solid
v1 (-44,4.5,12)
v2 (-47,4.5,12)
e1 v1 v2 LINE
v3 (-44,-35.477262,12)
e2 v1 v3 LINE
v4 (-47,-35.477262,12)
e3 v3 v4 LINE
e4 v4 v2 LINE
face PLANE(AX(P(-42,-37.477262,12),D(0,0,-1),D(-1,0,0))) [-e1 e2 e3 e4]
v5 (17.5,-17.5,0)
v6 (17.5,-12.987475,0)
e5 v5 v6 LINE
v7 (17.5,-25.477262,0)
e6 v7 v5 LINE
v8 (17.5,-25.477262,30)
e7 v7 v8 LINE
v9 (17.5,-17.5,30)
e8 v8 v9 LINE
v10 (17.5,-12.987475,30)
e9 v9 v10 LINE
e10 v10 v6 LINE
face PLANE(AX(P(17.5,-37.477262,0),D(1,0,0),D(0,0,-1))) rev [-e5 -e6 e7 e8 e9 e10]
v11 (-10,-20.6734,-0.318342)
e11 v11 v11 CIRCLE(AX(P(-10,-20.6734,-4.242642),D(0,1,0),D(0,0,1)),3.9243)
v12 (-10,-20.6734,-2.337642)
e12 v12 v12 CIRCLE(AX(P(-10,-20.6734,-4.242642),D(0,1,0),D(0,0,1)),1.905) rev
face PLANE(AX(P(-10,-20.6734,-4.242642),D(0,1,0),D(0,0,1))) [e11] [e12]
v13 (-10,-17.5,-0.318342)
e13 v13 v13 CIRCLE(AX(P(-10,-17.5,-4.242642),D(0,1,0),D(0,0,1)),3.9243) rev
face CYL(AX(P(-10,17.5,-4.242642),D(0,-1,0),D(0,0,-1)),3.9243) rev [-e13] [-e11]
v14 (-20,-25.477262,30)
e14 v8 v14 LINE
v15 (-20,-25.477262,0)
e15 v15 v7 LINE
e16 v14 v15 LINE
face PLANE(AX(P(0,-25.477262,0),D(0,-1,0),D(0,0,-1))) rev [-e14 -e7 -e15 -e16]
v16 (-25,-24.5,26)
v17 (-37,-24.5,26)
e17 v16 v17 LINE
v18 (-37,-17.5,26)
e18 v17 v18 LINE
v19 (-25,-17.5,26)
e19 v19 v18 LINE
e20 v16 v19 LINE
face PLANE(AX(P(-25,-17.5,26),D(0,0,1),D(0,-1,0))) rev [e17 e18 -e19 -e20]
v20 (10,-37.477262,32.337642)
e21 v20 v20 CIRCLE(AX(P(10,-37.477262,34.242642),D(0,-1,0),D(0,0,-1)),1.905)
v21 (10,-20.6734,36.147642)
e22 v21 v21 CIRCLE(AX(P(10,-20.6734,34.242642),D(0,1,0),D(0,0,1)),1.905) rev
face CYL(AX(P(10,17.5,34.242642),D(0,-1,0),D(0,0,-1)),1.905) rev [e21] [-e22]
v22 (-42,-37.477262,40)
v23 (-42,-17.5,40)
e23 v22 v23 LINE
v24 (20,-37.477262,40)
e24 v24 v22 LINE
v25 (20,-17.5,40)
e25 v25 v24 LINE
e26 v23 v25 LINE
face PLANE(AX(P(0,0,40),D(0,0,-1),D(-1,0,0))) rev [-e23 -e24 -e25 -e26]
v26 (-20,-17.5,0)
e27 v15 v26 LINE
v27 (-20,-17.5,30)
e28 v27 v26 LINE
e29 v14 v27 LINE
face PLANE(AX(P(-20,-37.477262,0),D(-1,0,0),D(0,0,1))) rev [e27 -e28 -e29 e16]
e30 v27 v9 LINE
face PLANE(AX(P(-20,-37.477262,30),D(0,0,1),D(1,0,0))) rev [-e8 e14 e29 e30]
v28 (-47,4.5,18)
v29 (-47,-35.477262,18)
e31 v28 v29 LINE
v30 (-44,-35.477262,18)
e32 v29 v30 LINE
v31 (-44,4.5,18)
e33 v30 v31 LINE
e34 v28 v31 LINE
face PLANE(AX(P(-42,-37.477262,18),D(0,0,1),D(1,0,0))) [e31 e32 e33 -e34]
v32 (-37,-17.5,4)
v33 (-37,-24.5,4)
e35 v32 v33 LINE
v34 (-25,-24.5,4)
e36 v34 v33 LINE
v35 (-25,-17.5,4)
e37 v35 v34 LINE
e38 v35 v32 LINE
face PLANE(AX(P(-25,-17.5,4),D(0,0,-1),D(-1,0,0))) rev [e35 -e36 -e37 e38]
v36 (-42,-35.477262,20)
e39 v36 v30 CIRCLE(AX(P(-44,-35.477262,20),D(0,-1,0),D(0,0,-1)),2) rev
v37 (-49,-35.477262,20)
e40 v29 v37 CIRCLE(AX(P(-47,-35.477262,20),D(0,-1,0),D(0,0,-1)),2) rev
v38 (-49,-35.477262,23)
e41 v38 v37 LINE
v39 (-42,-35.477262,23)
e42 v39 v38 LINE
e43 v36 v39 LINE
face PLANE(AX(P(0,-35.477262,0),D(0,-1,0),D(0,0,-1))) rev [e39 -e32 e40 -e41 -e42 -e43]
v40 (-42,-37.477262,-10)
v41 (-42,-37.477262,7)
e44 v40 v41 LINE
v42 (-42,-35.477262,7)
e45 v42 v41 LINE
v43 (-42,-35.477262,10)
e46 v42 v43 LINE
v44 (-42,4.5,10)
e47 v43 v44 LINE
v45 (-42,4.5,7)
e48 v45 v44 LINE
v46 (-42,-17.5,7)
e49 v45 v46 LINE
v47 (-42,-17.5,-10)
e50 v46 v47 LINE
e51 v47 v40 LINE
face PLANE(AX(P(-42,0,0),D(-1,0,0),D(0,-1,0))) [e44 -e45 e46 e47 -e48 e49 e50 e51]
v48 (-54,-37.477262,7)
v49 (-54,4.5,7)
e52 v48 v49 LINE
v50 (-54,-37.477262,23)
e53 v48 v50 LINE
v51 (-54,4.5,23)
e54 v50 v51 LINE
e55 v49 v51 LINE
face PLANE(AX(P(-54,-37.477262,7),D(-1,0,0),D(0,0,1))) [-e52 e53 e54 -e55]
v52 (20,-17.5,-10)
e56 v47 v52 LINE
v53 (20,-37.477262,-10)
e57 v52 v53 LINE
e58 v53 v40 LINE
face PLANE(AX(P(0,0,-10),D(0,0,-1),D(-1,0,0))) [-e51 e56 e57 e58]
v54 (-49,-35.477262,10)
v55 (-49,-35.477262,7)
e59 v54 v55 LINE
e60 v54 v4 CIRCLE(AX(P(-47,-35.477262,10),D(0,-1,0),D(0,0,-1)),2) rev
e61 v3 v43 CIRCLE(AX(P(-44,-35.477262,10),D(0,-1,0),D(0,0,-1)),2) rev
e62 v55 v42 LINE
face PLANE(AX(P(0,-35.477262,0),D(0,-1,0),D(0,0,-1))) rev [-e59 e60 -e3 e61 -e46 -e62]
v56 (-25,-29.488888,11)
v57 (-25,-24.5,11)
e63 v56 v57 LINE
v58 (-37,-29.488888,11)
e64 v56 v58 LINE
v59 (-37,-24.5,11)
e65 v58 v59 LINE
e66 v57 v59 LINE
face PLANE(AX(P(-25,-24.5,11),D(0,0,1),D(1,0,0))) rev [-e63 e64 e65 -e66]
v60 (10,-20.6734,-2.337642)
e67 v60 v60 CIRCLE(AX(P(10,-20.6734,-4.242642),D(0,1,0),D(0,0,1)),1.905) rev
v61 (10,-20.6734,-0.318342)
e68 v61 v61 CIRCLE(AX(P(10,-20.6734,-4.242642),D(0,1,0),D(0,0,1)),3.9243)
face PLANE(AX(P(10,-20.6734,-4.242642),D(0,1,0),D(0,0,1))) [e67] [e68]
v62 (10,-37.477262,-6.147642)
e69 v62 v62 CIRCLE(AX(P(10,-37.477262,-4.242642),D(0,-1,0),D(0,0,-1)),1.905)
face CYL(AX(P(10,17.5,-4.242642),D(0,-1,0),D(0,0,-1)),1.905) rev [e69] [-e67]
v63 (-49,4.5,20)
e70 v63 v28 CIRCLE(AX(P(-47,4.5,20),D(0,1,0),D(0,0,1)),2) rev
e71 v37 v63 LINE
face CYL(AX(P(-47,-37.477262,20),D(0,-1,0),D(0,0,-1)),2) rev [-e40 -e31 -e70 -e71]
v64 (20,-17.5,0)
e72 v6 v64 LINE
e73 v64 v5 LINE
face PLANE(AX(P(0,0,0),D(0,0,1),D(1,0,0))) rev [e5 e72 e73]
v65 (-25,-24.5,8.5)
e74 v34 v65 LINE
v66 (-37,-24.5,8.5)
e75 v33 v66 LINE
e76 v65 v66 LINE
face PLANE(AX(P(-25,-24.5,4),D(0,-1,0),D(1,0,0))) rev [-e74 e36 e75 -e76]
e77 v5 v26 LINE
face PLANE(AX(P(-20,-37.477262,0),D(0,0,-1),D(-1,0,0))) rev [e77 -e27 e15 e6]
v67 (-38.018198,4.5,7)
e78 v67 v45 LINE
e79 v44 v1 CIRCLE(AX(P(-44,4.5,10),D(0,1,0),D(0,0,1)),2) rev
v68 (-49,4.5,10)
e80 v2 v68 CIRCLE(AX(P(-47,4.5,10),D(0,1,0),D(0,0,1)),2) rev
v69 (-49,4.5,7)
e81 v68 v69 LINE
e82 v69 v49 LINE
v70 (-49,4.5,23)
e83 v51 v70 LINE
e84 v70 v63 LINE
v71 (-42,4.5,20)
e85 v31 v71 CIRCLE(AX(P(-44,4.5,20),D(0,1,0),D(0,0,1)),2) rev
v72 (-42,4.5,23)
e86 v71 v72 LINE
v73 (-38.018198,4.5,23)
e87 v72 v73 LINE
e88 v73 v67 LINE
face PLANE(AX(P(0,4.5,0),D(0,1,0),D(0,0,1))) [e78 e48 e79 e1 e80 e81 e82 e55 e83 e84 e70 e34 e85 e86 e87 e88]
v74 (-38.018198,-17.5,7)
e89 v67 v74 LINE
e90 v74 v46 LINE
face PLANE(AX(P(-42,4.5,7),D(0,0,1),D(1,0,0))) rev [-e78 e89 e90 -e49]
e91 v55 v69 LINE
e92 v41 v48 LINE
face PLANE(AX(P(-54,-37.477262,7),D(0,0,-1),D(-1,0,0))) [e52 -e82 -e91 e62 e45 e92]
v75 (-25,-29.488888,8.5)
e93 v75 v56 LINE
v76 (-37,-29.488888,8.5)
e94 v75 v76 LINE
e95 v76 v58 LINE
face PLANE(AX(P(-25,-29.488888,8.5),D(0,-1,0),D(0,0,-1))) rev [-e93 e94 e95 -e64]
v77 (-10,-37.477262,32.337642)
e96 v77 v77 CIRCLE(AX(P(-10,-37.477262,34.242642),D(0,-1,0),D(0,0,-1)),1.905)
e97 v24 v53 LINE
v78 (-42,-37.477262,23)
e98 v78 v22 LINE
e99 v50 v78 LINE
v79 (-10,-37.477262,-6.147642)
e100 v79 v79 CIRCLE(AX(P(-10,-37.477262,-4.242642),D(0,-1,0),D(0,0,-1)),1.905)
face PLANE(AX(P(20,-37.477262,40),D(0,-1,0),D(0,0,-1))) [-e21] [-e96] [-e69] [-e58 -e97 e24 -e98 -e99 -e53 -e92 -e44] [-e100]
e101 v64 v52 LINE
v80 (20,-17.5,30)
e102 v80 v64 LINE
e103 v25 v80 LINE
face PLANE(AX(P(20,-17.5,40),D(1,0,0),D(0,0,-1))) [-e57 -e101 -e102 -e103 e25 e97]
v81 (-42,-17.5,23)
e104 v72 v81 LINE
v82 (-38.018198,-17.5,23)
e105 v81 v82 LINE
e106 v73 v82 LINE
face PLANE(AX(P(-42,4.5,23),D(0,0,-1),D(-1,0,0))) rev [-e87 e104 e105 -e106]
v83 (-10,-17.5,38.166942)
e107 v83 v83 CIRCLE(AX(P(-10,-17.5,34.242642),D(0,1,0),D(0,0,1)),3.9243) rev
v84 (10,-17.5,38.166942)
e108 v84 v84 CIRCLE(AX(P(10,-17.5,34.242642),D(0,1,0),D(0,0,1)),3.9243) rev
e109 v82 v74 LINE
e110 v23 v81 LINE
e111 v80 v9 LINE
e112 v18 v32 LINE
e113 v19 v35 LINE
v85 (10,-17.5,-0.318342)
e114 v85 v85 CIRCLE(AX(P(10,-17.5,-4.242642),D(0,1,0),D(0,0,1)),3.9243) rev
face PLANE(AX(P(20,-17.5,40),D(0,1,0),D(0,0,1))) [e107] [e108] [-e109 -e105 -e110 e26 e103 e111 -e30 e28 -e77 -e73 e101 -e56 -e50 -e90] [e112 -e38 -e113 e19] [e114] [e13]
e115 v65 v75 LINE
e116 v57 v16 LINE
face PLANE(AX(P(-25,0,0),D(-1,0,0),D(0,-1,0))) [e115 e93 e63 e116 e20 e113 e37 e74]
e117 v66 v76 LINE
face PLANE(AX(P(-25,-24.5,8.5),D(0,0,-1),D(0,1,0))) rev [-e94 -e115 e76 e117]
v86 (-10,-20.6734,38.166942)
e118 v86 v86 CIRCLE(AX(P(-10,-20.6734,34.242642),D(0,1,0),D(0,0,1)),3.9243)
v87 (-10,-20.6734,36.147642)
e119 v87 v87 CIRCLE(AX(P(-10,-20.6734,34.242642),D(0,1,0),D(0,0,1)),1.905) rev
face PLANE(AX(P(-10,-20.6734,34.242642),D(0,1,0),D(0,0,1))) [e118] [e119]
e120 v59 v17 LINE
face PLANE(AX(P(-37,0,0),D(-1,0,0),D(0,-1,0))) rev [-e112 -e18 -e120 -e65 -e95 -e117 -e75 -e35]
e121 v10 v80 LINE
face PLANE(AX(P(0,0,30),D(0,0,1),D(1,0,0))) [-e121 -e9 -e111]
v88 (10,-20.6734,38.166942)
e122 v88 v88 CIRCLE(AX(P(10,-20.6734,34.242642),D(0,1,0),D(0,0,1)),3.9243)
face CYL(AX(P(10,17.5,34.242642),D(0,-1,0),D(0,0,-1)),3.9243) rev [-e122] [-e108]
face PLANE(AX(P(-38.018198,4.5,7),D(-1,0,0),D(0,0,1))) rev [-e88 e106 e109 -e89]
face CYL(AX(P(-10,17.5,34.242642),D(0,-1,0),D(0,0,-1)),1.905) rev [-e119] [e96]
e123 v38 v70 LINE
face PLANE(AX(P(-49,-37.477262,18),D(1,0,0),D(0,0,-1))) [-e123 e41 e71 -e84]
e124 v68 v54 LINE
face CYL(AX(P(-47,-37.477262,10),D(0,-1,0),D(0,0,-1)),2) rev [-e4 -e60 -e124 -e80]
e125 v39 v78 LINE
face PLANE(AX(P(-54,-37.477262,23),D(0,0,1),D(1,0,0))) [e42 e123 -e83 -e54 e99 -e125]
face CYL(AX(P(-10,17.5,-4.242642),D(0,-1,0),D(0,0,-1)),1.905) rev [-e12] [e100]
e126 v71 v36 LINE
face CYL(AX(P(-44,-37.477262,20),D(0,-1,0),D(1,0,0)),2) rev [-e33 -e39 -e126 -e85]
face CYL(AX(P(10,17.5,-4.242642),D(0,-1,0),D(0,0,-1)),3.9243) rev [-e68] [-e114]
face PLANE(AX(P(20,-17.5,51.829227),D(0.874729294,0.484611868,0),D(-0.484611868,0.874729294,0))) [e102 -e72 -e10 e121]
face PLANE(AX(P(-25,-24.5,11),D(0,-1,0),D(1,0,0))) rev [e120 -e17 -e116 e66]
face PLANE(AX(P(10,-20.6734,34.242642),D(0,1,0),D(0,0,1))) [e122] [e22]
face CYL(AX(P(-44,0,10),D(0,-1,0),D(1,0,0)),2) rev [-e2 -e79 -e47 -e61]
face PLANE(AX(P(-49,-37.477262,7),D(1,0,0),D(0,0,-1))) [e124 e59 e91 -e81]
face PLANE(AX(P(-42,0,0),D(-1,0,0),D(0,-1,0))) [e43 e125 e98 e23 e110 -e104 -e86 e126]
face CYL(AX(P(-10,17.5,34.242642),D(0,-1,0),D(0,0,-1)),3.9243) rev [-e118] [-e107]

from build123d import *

# Parameters (mm, degrees)
SKETCH1_R               = 17.5
BOSS_EXTRUDE1_DEPTH     = 30
SKETCH5_R               = 10.95
CUT_EXTRUDE2_DEPTH      = 39.890873
SWEEP2_PITCH            = 10
SKETCH8_R               = 17.5
CUT_EXTRUDE3_DEPTH      = 41.699
SKETCH9_R               = 17.5
CUT_EXTRUDE4_DEPTH      = 39.890874
SKETCH10_W              = 40
SKETCH10_H              = 19.977262
BOSS_EXTRUDE2_DEPTH     = 40
SKETCH11_W              = 40
SKETCH11_H              = 19.977262
BOSS_EXTRUDE3_DEPTH     = 10
BOSS_EXTRUDE4_DEPTH     = 30
SKETCH14_R              = 1.905
CUT_EXTRUDE5_DEPTH      = 71.869594
SKETCH15_R              = 3.9243
CUT_EXTRUDE7_DEPTH      = 59.798031
SKETCH16_W              = 50
SKETCH16_H              = 19.977262
BOSS_EXTRUDE5_DEPTH     = 22
CUT_EXTRUDE8_DEPTH      = 12
BOSS_EXTRUDE6_DEPTH     = 19.977262
BOSS_EXTRUDE7_DEPTH     = 22
FILLET1_R               = 2
SKETCH21_W              = 7
SKETCH21_H              = 16
BOSS_EXTRUDE8_DEPTH     = 2
CUT_EXTRUDE9_DEPTH      = 76.769387
CUT_EXTRUDE9_DEPTH_BACK = 76.769387
SKETCH22_W              = 37.5
SKETCH22_H              = 30
SKETCH24_W              = 37.5
SKETCH24_H              = 30
BOSS_EXTRUDE9_DEPTH     = 12


with BuildPart() as part:
    # Sketch1 → Boss-Extrude1 (new body)
    with BuildSketch(Plane.XY):
        Circle(SKETCH1_R)
    extrude(amount=BOSS_EXTRUDE1_DEPTH)

    # Sketch5 → Cut-Extrude2 (cut, through all)
    with BuildSketch(Plane(origin=(0, 0, 0), x_dir=(-1, 0, 0), z_dir=(0, 0, -1))):
        Circle(SKETCH5_R)
    extrude(amount=-CUT_EXTRUDE2_DEPTH, mode=Mode.SUBTRACT)

    # Sweep2: arcs per turn and ends read off the stored shape
    # Sweep2: the profile of Sketch7 profile screwed along a right-hand helix through 3.75 turns, 16 arcs to a turn; built about Z, then put on its axis
    sweep2_z = Axis((0, 0, 0), (0, 0, 1))
    sweep2_corners = [(0, 7.7, 2.933013), (0, 10.9503, 4.809574), (0, 10.9503, 0.190426), (0, 7.7, 2.066987), (0, 7.45, 2.5)]
    with BuildLine(mode=Mode.PRIVATE) as sweep2_profile:
        Line(sweep2_corners[0], sweep2_corners[1])
        Line(sweep2_corners[1], sweep2_corners[2])
        Line(sweep2_corners[2], sweep2_corners[3])
        ThreePointArc((0, 7.7, 2.066987), (0, 7.516988, 2.25), (0, 7.45, 2.5))
        ThreePointArc((0, 7.45, 2.5), (0, 7.516988, 2.75), (0, 7.7, 2.933013))
    sweep2_cap = Face(sweep2_profile.wire())
    sweep2_arcs = [((0, 7.7, 2.066987), (0, 7.45, 2.211325), (0, 7.45, 2.5), (1, 0.8660254037844395, 1)), ((0, 7.45, 2.5), (0, 7.45, 2.788675), (0, 7.7, 2.933013), (1, 0.8660254037844395, 1))]  # start, shoulder, end, weights
    sweep2_turn_angles = [0, 11.25, 22.5, 33.75, 45, 56.25, 67.5, 78.75, 90, 101.25, 112.5, 123.75, 135, 146.25, 157.5, 168.75, 180, 191.25, 202.5, 213.75, 225, 236.25, 247.5, 258.75, 270, 281.25, 292.5, 303.75, 315, 326.25, 337.5, 348.75, 360]
    sweep2_turn_weights = [1, 0.9807852804032304, 1, 0.9807852804032304, 1, 0.9807852804032304, 1, 0.9807852804032304, 1, 0.9807852804032304, 1, 0.9807852804032304, 1, 0.9807852804032304, 1, 0.9807852804032304, 1, 0.9807852804032304, 1, 0.9807852804032304, 1, 0.9807852804032304, 1, 0.9807852804032304, 1, 0.9807852804032304, 1, 0.9807852804032304, 1, 0.9807852804032304, 1, 0.9807852804032304, 1]
    sweep2_turn_rails = [Edge.make_bspline([Vector(p[0], p[1], 0).rotate(sweep2_z, sweep2_turn_angles[k]) / sweep2_turn_weights[k] + Vector(0, 0, p[2] + SWEEP2_PITCH * sweep2_turn_angles[k] / 360) for k in range(33)], [0, 0, 0, 1, 1, 2, 2, 3, 3, 4, 4, 5, 5, 6, 6, 7, 7, 8, 8, 9, 9, 10, 10, 11, 11, 12, 12, 13, 13, 14, 14, 15, 15, 16, 16, 16], 2, sweep2_turn_weights) for p in sweep2_corners]
    sweep2_turn_sides = [*[Face.make_surface_from_curves(sweep2_turn_rails[p[0]], sweep2_turn_rails[p[1]]) for p in [(0, 1), (1, 2), (2, 3)]], *[Face.make_bezier_surface([[Vector(p[j][0], p[j][1], 0).rotate(sweep2_z, sweep2_turn_angles[2 * i + k]) / sweep2_turn_weights[2 * i + k] + Vector(0, 0, p[j][2] + SWEEP2_PITCH * sweep2_turn_angles[2 * i + k] / 360) for k in range(3)] for j in range(3)], [[p[3][j] * sweep2_turn_weights[2 * i + k] for k in range(3)] for j in range(3)]) for p in sweep2_arcs for i in range(16)]]
    sweep2_last_angles = [1080, 1091.25, 1102.5, 1113.75, 1125, 1136.25, 1147.5, 1158.75, 1170, 1181.25, 1192.5, 1203.75, 1215, 1226.25, 1237.5, 1248.75, 1260, 1271.25, 1282.5, 1293.75, 1305, 1316.25, 1327.5, 1338.75, 1350]
    sweep2_last_weights = [1, 0.9807852804032304, 1, 0.9807852804032304, 1, 0.9807852804032304, 1, 0.9807852804032304, 1, 0.9807852804032304, 1, 0.9807852804032304, 1, 0.9807852804032304, 1, 0.9807852804032304, 1, 0.9807852804032304, 1, 0.9807852804032304, 1, 0.9807852804032304, 1, 0.9807852804032304, 1]
    sweep2_last_rails = [Edge.make_bspline([Vector(p[0], p[1], 0).rotate(sweep2_z, sweep2_last_angles[k]) / sweep2_last_weights[k] + Vector(0, 0, p[2] + SWEEP2_PITCH * sweep2_last_angles[k] / 360) for k in range(25)], [0, 0, 0, 1, 1, 2, 2, 3, 3, 4, 4, 5, 5, 6, 6, 7, 7, 8, 8, 9, 9, 10, 10, 11, 11, 12, 12, 12], 2, sweep2_last_weights) for p in sweep2_corners]
    sweep2_last_sides = [*[Face.make_surface_from_curves(sweep2_last_rails[p[0]], sweep2_last_rails[p[1]]) for p in [(0, 1), (1, 2), (2, 3)]], *[Face.make_bezier_surface([[Vector(p[j][0], p[j][1], 0).rotate(sweep2_z, sweep2_last_angles[2 * i + k]) / sweep2_last_weights[2 * i + k] + Vector(0, 0, p[j][2] + SWEEP2_PITCH * sweep2_last_angles[2 * i + k] / 360) for k in range(3)] for j in range(3)], [[p[3][j] * sweep2_last_weights[2 * i + k] for k in range(3)] for j in range(3)]) for p in sweep2_arcs for i in range(12)]]
    sweep2 = Plane(origin=(0, 0, -10), x_dir=(-1, 0, 0), z_dir=(0, 0, 1)) * Solid(Shell([*[p.moved(Location((0, 0, SWEEP2_PITCH * i))) for i in range(3) for p in sweep2_turn_sides], *sweep2_last_sides, sweep2_cap, sweep2_cap.rotate(sweep2_z, 1350).moved(Location((0, 0, SWEEP2_PITCH * 1350 / 360)))]))
    add(sweep2)

    # Sketch8 → Cut-Extrude3 (cut, through all)
    with BuildSketch(Plane(origin=(0, 0, 0), x_dir=(-1, 0, 0), z_dir=(0, 0, -1))):
        with Locations(Location((0, 0, 0), (0, 0, 180))):
            Circle(SKETCH8_R)
    extrude(amount=CUT_EXTRUDE3_DEPTH, mode=Mode.SUBTRACT)

    # Sketch9 → Cut-Extrude4 (cut, through all)
    with BuildSketch(Plane.XY.offset(30)):
        Circle(SKETCH9_R)
    extrude(amount=CUT_EXTRUDE4_DEPTH, mode=Mode.SUBTRACT)



with BuildPart() as body_2:
    # Sketch10 → Boss-Extrude2 (new body)
    with BuildSketch(Plane(origin=(0, 0, 0), x_dir=(-1, 0, 0), z_dir=(0, 0, -1))):
        with Locations((0, -27.488631)):
            Rectangle(SKETCH10_W, SKETCH10_H)
    extrude(amount=-BOSS_EXTRUDE2_DEPTH)

    # Sketch11 → Boss-Extrude3 (add)
    with BuildSketch(Plane(origin=(0, 0, 0), x_dir=(-1, 0, 0), z_dir=(0, 0, -1))):
        with Locations((0, -27.488631)):
            Rectangle(SKETCH11_W, SKETCH11_H)
    extrude(amount=BOSS_EXTRUDE3_DEPTH)


with BuildPart() as part_1:
    add(part.part)

    add(body_2.part)  # Boss-Extrude4 merges body 2
    # Sketch13 → Boss-Extrude4 (add)
    with BuildSketch(Plane(origin=(0, 0, 0), x_dir=(-1, 0, 0), z_dir=(0, 0, -1))):
        with BuildLine():
            Line((0, -17.5), (-20, -17.5))
            Line((-20, -17.5), (-15.153881, -8.752707))
            ThreePointArc((-15.153881, -8.752707), (-8.748646, -15.156226), (0, -17.5))
        make_face()
    boss_extrude4 = extrude(amount=-BOSS_EXTRUDE4_DEPTH)

    # Mirror1: Boss-Extrude4 across plane
    add(boss_extrude4.mirror(Plane(origin=(0, 0, 0), x_dir=(0, 0, 1), z_dir=(1, 0, 0))))

    # Sketch14 → Cut-Extrude5 (cut, through all)
    with BuildSketch(Plane.XZ.offset(37.477262)):
        with Locations(Location((-10, 34.242642, 0), (0, 0, 270))):
            Circle(SKETCH14_R)
        with Locations(Location((10, 34.242642, 0), (0, 0, 270))):
            Circle(SKETCH14_R)
        with Locations(Location((-10, -4.242642, 0), (0, 0, 270))):
            Circle(SKETCH14_R)
        with Locations(Location((10, -4.242642, 0), (0, 0, 270))):
            Circle(SKETCH14_R)
    extrude(amount=-CUT_EXTRUDE5_DEPTH, mode=Mode.SUBTRACT)

    # Sketch15 → Cut-Extrude7 (cut, through all)
    with BuildSketch(Plane(origin=(0, -20.6734, 0), x_dir=(1, 0, 0), z_dir=(0, 1, 0))):
        with Locations(Location((-10, 4.242642, 0), (0, 0, 270))):
            Circle(SKETCH15_R)
        with Locations(Location((10, 4.242642, 0), (0, 0, 270))):
            Circle(SKETCH15_R)
        with Locations(Location((10, -34.242642, 0), (0, 0, 270))):
            Circle(SKETCH15_R)
        with Locations(Location((-10, -34.242642, 0), (0, 0, 270))):
            Circle(SKETCH15_R)
    extrude(amount=CUT_EXTRUDE7_DEPTH, mode=Mode.SUBTRACT)

    # Sketch16 → Boss-Extrude5 (add)
    with BuildSketch(Plane.ZY.offset(20)):
        with Locations((15, -27.488631)):
            Rectangle(SKETCH16_W, SKETCH16_H)
    extrude(amount=BOSS_EXTRUDE5_DEPTH)

    # Sketch17 → Cut-Extrude8 (cut)
    with BuildSketch(Plane.ZY.offset(37)):
        Polygon((4, -24.5), (8.5, -24.5), (8.5, -29.488888), (11, -29.488888), (11, -24.5), (26, -24.5), (26, -17.5), (4, -17.5), align=None)
    extrude(amount=-CUT_EXTRUDE8_DEPTH, mode=Mode.SUBTRACT)

    # Sketch19 → Boss-Extrude6 (add, through all)
    with BuildSketch(Plane(origin=(0, -17.5, 0), x_dir=(1, 0, 0), z_dir=(0, 1, 0))):
        Polygon((-42, -12), (-49, -12), (-49, -7), (-54, -7), (-54, -23), (-49, -23), (-49, -18), (-42, -18), align=None)
    extrude(amount=-BOSS_EXTRUDE6_DEPTH)

    # Sketch20 → Boss-Extrude7 (add)
    with BuildSketch(Plane(origin=(0, -17.5, 0), x_dir=(1, 0, 0), z_dir=(0, 1, 0))):
        Polygon((-54, -7), (-49, -7), (-49, -12), (-42, -12), (-42, -7), (-38.018198, -7), (-38.018198, -23), (-42, -23), (-42, -18), (-49, -18), (-49, -23), (-54, -23), align=None)
    extrude(amount=BOSS_EXTRUDE7_DEPTH)

    # Fillet1
    fillet1_edges = [part_1.edges().sort_by_distance(p)[0] for p in [
        (-42, -16.488631, 12),
        (-42, -16.488631, 18),
        (-49, -16.488631, 18),
        (-49, -16.488631, 12),
    ]]
    fillet(fillet1_edges, radius=FILLET1_R)

    # Sketch21 → Boss-Extrude8 (add)
    with BuildSketch(Plane.XZ.offset(37.477262)):
        with Locations((-45.5, 15)):
            Rectangle(SKETCH21_W, SKETCH21_H)
    extrude(amount=-BOSS_EXTRUDE8_DEPTH)

    # Sketch22 → Cut-Extrude9 (cut, two sides: drawn at the far end of the back side and taken through both)
    with BuildSketch(Plane(origin=(0, -17.5, 0), x_dir=(1, 0, 0), z_dir=(0, 1, 0)).offset(-CUT_EXTRUDE9_DEPTH_BACK)):
        with Locations((-1.25, -15)):
            Rectangle(SKETCH22_W, SKETCH22_H)
    extrude(amount=CUT_EXTRUDE9_DEPTH + CUT_EXTRUDE9_DEPTH_BACK, mode=Mode.SUBTRACT)

    # Sketch24 → Boss-Extrude9 (add)
    with BuildSketch(Plane.XZ.offset(37.477262)):
        with Locations((-1.25, 15)):
            Rectangle(SKETCH24_W, SKETCH24_H)
    extrude(amount=-BOSS_EXTRUDE9_DEPTH)


solid = part_1.part
